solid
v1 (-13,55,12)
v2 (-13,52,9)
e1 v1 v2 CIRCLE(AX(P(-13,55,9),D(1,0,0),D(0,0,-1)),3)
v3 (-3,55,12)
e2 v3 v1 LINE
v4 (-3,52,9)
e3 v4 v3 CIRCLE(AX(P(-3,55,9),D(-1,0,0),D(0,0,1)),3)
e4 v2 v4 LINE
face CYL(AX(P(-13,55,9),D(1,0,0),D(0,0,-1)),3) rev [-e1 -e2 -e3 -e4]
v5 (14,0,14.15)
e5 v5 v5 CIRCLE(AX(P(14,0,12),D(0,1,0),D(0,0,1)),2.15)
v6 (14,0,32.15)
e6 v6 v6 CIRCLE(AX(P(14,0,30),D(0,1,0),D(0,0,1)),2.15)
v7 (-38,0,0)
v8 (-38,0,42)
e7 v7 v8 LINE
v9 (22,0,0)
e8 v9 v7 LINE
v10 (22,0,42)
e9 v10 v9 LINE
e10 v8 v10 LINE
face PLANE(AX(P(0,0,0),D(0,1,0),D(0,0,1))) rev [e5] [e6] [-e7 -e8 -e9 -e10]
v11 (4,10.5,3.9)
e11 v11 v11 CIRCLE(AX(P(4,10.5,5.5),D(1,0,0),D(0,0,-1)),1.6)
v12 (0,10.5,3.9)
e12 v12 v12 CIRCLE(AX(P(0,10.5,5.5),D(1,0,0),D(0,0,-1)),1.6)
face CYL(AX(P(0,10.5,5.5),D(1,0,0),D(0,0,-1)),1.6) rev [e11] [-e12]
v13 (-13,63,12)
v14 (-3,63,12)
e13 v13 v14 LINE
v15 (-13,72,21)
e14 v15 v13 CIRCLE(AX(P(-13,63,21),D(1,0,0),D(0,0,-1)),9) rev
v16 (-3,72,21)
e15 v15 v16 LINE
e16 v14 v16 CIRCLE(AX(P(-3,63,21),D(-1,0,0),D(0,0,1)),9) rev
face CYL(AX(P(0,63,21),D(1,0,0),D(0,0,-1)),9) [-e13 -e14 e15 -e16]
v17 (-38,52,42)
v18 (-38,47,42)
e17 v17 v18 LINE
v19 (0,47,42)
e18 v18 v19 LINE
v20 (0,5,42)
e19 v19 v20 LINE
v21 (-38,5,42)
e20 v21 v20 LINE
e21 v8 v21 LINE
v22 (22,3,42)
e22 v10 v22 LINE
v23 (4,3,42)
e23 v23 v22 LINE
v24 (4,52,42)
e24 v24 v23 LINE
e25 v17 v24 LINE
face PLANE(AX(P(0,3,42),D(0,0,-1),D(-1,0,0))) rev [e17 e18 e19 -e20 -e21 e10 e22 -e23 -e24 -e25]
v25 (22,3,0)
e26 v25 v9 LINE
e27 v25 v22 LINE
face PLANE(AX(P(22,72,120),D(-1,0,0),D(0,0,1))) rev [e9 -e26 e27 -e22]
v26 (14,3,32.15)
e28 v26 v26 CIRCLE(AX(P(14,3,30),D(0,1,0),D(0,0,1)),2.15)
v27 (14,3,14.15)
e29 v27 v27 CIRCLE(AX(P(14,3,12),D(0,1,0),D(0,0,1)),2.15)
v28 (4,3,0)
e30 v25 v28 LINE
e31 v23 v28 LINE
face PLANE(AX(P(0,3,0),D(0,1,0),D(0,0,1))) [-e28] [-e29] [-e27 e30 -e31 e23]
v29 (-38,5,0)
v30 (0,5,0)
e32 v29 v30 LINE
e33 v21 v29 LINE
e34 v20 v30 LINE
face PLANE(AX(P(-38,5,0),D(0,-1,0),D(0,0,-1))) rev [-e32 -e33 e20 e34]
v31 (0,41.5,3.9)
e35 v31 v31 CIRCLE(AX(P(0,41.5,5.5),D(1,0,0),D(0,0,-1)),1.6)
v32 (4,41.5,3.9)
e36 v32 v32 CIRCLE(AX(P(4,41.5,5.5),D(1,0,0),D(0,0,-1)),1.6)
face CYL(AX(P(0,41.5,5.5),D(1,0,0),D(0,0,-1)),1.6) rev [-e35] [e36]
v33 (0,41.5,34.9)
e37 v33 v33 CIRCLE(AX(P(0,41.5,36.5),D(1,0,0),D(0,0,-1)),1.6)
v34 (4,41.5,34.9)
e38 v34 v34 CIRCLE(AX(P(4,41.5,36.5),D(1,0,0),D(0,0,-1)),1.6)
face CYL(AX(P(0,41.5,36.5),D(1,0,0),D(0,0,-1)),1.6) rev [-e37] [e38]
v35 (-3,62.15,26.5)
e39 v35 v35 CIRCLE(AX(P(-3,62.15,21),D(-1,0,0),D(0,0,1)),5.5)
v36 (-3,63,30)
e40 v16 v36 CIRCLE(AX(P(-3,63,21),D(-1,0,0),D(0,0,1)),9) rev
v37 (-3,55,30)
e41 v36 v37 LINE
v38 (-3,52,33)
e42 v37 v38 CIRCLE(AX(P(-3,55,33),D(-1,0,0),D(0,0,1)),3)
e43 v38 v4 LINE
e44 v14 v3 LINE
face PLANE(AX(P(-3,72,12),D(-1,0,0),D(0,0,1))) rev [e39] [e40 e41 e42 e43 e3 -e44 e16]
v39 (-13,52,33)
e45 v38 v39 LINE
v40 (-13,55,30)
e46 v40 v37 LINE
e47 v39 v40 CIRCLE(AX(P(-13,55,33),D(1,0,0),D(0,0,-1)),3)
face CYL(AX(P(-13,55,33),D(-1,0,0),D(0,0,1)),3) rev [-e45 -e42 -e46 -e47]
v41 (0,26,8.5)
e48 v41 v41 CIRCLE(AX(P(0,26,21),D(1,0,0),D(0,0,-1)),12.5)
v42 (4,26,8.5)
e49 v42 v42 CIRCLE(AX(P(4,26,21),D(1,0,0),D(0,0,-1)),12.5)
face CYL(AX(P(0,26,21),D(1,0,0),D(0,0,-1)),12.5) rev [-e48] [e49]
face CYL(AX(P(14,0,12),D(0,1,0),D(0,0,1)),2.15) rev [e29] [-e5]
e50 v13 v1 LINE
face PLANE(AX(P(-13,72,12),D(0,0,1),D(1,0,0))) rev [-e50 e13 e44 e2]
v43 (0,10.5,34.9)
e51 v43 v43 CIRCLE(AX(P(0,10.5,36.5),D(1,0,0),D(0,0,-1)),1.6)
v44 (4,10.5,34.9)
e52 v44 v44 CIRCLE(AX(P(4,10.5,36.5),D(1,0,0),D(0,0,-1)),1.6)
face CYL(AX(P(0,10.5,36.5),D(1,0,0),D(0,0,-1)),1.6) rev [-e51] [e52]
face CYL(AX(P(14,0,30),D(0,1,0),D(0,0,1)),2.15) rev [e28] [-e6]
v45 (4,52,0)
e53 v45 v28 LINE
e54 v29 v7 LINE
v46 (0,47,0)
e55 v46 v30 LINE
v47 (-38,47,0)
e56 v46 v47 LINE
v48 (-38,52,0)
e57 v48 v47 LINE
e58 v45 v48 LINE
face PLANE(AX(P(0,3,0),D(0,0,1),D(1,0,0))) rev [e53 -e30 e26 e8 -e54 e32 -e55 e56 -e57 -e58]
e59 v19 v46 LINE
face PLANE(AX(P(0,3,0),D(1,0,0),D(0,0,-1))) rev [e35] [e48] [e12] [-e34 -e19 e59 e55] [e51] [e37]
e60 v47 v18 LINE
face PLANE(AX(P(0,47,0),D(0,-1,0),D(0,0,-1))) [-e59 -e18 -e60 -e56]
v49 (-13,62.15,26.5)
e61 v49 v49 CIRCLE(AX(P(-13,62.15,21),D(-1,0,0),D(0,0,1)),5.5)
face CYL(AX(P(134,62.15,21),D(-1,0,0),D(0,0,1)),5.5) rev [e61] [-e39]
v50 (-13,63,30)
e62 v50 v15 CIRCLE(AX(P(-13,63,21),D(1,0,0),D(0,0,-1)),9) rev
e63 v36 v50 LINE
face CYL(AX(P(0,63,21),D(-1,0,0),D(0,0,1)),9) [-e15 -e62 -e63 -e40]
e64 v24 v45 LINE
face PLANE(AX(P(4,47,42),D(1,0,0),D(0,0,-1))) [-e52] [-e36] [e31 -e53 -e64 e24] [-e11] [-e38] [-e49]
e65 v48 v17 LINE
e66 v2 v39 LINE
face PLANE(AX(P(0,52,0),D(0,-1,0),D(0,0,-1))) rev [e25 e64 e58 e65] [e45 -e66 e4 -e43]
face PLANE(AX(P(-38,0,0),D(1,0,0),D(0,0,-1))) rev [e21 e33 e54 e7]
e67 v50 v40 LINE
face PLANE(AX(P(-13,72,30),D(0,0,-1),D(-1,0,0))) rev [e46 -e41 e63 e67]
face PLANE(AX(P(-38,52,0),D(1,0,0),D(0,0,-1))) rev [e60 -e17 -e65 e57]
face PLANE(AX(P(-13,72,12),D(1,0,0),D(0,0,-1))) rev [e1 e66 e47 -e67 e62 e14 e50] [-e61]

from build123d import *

# Parameters (mm, degrees)
SKETCH1_W            = 94
SKETCH1_H            = 42
BOSS_EXTRUDE1_DEPTH  = 3
SKETCH2_W            = 4
SKETCH2_H            = 42
BOSS_EXTRUDE2_DEPTH  = 47
SKETCH3_R            = 12.5
SKETCH3_R_2          = 1.6
CUT_EXTRUDE1_DEPTH   = 114.176852757
SKETCH4_W            = 42
SKETCH4_H            = 5
BOSS_EXTRUDE3_DEPTH  = 40
SKETCH5_W            = 42
SKETCH5_H            = 5
BOSS_EXTRUDE4_DEPTH  = 38
SKETCH7_W            = 42
SKETCH7_H            = 42
SKETCH7_W_2          = 44
BOSS_EXTRUDE6_DEPTH  = 5
SKETCH9_R            = 2.15
CUT_EXTRUDE2_DEPTH   = 149.731301346
SKETCH11_W           = 10
SKETCH11_H           = 18
BOSS_EXTRUDE7_DEPTH  = 20
SKETCH13_R           = 5.5
CUT_EXTRUDE3_DEPTH   = 169.988165266
BOSS_EXTRUDE11_DEPTH = 5
SKETCH23_W           = 10
SKETCH23_H           = 26
BOSS_EXTRUDE12_DEPTH = 50
CUT_EXTRUDE7_DEPTH   = 193.595430891
SKETCH25_W           = 10
SKETCH25_H           = 18
BOSS_EXTRUDE13_DEPTH = 20
SKETCH26_R           = 5.5
CUT_EXTRUDE8_DEPTH   = 193.595430891
SKETCH27_W           = 12
SKETCH27_H           = 18
BOSS_EXTRUDE14_DEPTH = 69
CUT_EXTRUDE10_START  = -5
SKETCH28_R           = 5.5
CUT_EXTRUDE10_DEPTH  = 5
SKETCH29_R           = 5.5
CUT_EXTRUDE11_DEPTH  = 5
FILLET4_R            = 9
FILLET3_R            = 3
SKETCH30_W           = 112
SKETCH30_H           = 120
CUT_EXTRUDE13_DEPTH  = 181.413414135


# Some blends are built 0.0001 mm under size
with BuildPart() as part:
    # Sketch1 → Boss-Extrude1 (new body)
    with BuildSketch(Plane(origin=(0, 0, 0), x_dir=(1, 0, 0), z_dir=(0, 1, 0))):
        with Locations((47, -21)):
            Rectangle(SKETCH1_W, SKETCH1_H)
    extrude(amount=BOSS_EXTRUDE1_DEPTH)

    # Sketch2 → Boss-Extrude2 (add)
    with BuildSketch(Plane.XZ):
        with Locations((2, 21)):
            Rectangle(SKETCH2_W, SKETCH2_H)
        with Locations((92, 21)):
            Rectangle(SKETCH2_W, SKETCH2_H)
    extrude(amount=-BOSS_EXTRUDE2_DEPTH)

    # Sketch3 → Cut-Extrude1 (cut, through all)
    with BuildSketch(Plane(origin=(94, 0, 0), x_dir=(0, 0, -1), z_dir=(1, 0, 0))):
        with Locations((-21, 26)):
            Circle(SKETCH3_R)
        with Locations((-36.5, 41.5)):
            Circle(SKETCH3_R_2)
        with Locations((-5.5, 41.5)):
            Circle(SKETCH3_R_2)
        with Locations((-36.5, 10.5)):
            Circle(SKETCH3_R_2)
        with Locations((-5.5, 10.5)):
            Circle(SKETCH3_R_2)
    extrude(amount=-CUT_EXTRUDE1_DEPTH, mode=Mode.SUBTRACT)

    # Sketch4 → Boss-Extrude3 (add)
    with BuildSketch(Plane(origin=(94, 0, 0), x_dir=(0, 0, -1), z_dir=(1, 0, 0))):
        with Locations((-21, 2.5)):
            Rectangle(SKETCH4_W, SKETCH4_H)
    extrude(amount=BOSS_EXTRUDE3_DEPTH)

    # Sketch5 → Boss-Extrude4 (add)
    with BuildSketch(Plane.ZY):
        with Locations((21, 2.5)):
            Rectangle(SKETCH5_W, SKETCH5_H)
    extrude(amount=BOSS_EXTRUDE4_DEPTH)

    # Sketch7 → Boss-Extrude6 (add)
    with BuildSketch(Plane(origin=(0, 47, 0), x_dir=(1, 0, 0), z_dir=(0, 1, 0))):
        with Locations((-17, -21)):
            Rectangle(SKETCH7_W, SKETCH7_H)
        with Locations((112, -21)):
            Rectangle(SKETCH7_W_2, SKETCH7_H)
    extrude(amount=BOSS_EXTRUDE6_DEPTH)

    # Sketch9 → Cut-Extrude2 (cut, through all)
    with BuildSketch(Plane(origin=(0, 3, 0), x_dir=(1, 0, 0), z_dir=(0, 1, 0))):
        with Locations(Location((83, -20, 0), (0, 0, 270))):
            Circle(SKETCH9_R)
        with Locations(Location((65, -20, 0), (0, 0, 270))):
            Circle(SKETCH9_R)
        with Locations(Location((74, -11, 0), (0, 0, 270))):
            Circle(SKETCH9_R)
        with Locations(Location((74, -29, 0), (0, 0, 270))):
            Circle(SKETCH9_R)
        with Locations(Location((14, -12, 0), (0, 0, 270))):
            Circle(SKETCH9_R)
        with Locations(Location((14, -30, 0), (0, 0, 270))):
            Circle(SKETCH9_R)
        with Locations(Location((30, -12, 0), (0, 0, 270))):
            Circle(SKETCH9_R)
        with Locations(Location((30, -30, 0), (0, 0, 270))):
            Circle(SKETCH9_R)
    extrude(amount=-CUT_EXTRUDE2_DEPTH, mode=Mode.SUBTRACT)

    # Sketch11 → Boss-Extrude7 (add)
    with BuildSketch(Plane(origin=(0, 52, 0), x_dir=(1, 0, 0), z_dir=(0, 1, 0))):
        with Locations((-8, -21)):
            Rectangle(SKETCH11_W, SKETCH11_H)
        with Locations((107, -21)):
            Rectangle(SKETCH11_W, SKETCH11_H)
    extrude(amount=BOSS_EXTRUDE7_DEPTH)

    # Sketch13 → Cut-Extrude3 (cut, through all)
    with BuildSketch(Plane.ZY.offset(13)):
        with Locations((21, 62.15)):
            Circle(SKETCH13_R)
    extrude(amount=-CUT_EXTRUDE3_DEPTH, mode=Mode.SUBTRACT)

    # Sketch20 → Boss-Extrude11 (add)
    with BuildSketch(Plane.XY.offset(42)):
        Polygon((134, 0), (134, 52), (90, 52), (90, 0), (95, 0), (95, 20), (102, 26), (112, 26), (129, 20), (129, 0), align=None)
    extrude(amount=BOSS_EXTRUDE11_DEPTH)

    # Sketch23 → Boss-Extrude12 (add)
    with BuildSketch(Plane.XY.offset(47)):
        with Locations((107, 39)):
            Rectangle(SKETCH23_W, SKETCH23_H)
    extrude(amount=BOSS_EXTRUDE12_DEPTH)

    # Sketch24 → Cut-Extrude7 (cut, through all)
    with BuildSketch(Plane(origin=(112, 0, 0), x_dir=(0, 0, -1), z_dir=(1, 0, 0))):
        Polygon((-47, 26), (-97, 39), (-97, 26), align=None)
    extrude(amount=-CUT_EXTRUDE7_DEPTH, mode=Mode.SUBTRACT)

    # Sketch25 → Boss-Extrude13 (add)
    with BuildSketch(Plane(origin=(0, 52, 0), x_dir=(1, 0, 0), z_dir=(0, 1, 0))):
        with Locations((107, -71)):
            Rectangle(SKETCH25_W, SKETCH25_H)
    extrude(amount=BOSS_EXTRUDE13_DEPTH)

    # Sketch26 → Cut-Extrude8 (cut, through all)
    with BuildSketch(Plane(origin=(112, 0, 0), x_dir=(0, 0, -1), z_dir=(1, 0, 0))):
        with Locations((-71, 62.15)):
            Circle(SKETCH26_R)
    extrude(amount=-CUT_EXTRUDE8_DEPTH, mode=Mode.SUBTRACT)

    # Sketch27 → Boss-Extrude14 (add)
    with BuildSketch(Plane(origin=(0, 3, 0), x_dir=(1, 0, 0), z_dir=(0, 1, 0))):
        with Locations((47, -21)):
            Rectangle(SKETCH27_W, SKETCH27_H)
    extrude(amount=BOSS_EXTRUDE14_DEPTH)

    # Sketch28 → Cut-Extrude10 (cut)
    with BuildSketch(Plane(origin=(53, 0, 0), x_dir=(0, 0, -1), z_dir=(1, 0, 0)).offset(CUT_EXTRUDE10_START)):
        with Locations(Location((-21, 62.15, 0), (0, 0, 180))):
            Circle(SKETCH28_R)
    extrude(amount=CUT_EXTRUDE10_DEPTH, mode=Mode.SUBTRACT)

    # Sketch29 → Cut-Extrude11 (cut)
    with BuildSketch(Plane.ZY.offset(-41)):
        with Locations((21, 62.15)):
            Circle(SKETCH29_R)
    extrude(amount=-CUT_EXTRUDE11_DEPTH, mode=Mode.SUBTRACT)

    # Fillet4
    fillet4_edges = [part.edges().sort_by_distance(p)[0] for p in [
        (-8, 72, 12),
        (-8, 72, 30),
        (107, 72, 12),
        (107, 72, 30),
        (107, 72, 62),
        (107, 72, 80),
        (47, 72, 12),
        (47, 72, 30),
    ]]
    fillet(fillet4_edges, radius=FILLET4_R - 0.0001)  # a hair under: the kernel refuses the full size

    # Fillet3
    # the kernel refuses this fillet: 3 mm, written as the material it adds along each edge
    with BuildSketch(Plane(origin=(-3, 52, 30), x_dir=(0, 1, 0), z_dir=(-1, 0, 0)), Plane(origin=(112, 52, 80), x_dir=(0, 1, 0), z_dir=(-1, 0, 0))) as fillet3_piece_1:
        with BuildLine():
            CenterArc((FILLET3_R, -FILLET3_R), FILLET3_R, 90, 90)
            Line((0, -FILLET3_R), (0, 0))
            Line((0, 0), (FILLET3_R, 0))
        make_face()
    extrude(amount=10)
    with BuildSketch(Plane(origin=(-13, 52, 12), x_dir=(0, 0, -1), z_dir=(1, 0, 0)), Plane(origin=(112, 52, 30), x_dir=(0, 0, 1), z_dir=(-1, 0, 0)), Plane(origin=(102, 52, 12), x_dir=(0, 0, -1), z_dir=(1, 0, 0)), Plane(origin=(102, 52, 62), x_dir=(0, 0, -1), z_dir=(1, 0, 0))) as fillet3_piece_2:
        with BuildLine():
            CenterArc((FILLET3_R, FILLET3_R), FILLET3_R, 180, 90)
            Line((0, FILLET3_R), (0, 0))
            Line((0, 0), (FILLET3_R, 0))
        make_face()
    extrude(amount=10)
    with BuildSketch(Plane(origin=(95, 20, 42), x_dir=(0, -1, 0), z_dir=(0, 0, 1))) as fillet3_piece_3:
        with BuildLine():
            CenterArc((FILLET3_R * 0.45993492247, FILLET3_R), FILLET3_R, 220.601294645, 49.398705355)
            Line((-FILLET3_R * 0.299321679895, FILLET3_R * 0.349208626544), (0, 0))
            Line((0, 0), (FILLET3_R * 0.45993492247, 0))
        make_face()
    extrude(amount=5)
    with BuildSketch(Plane(origin=(102, 26, 42), x_dir=(-0.7592566023652966, -0.6507913734559685, 0), z_dir=(0, 0, 1))) as fillet3_piece_4:
        with BuildLine():
            CenterArc((FILLET3_R * 0.369924076215, FILLET3_R), FILLET3_R, 229.398705355, 40.601294645)
            Line((-FILLET3_R * 0.28086729724, FILLET3_R * 0.240743397635), (0, 0))
            Line((0, 0), (FILLET3_R * 0.369924076215, 0))
        make_face()
    extrude(amount=5)
    with BuildSketch(Plane(origin=(112, 26, 42), x_dir=(0.942990333582889, -0.3328201177351389, 0), z_dir=(0, 0, 1))) as fillet3_piece_5:
        with BuildLine():
            CenterArc((FILLET3_R * 0.171292729553, -FILLET3_R), FILLET3_R, 90, 19.440034828)
            Line((-FILLET3_R * 0.161527388182, -FILLET3_R * 0.0570096664171), (0, 0))
            Line((0, 0), (FILLET3_R * 0.171292729553, 0))
        make_face()
    extrude(amount=5)
    with BuildSketch(Plane(origin=(129, 20, 42), x_dir=(0, -1, 0), z_dir=(0, 0, 1))) as fillet3_piece_6:
        with BuildLine():
            CenterArc((FILLET3_R * 0.707515081019, -FILLET3_R), FILLET3_R, 90, 70.559965172)
            Line((-FILLET3_R * 0.235475252564, -FILLET3_R * 0.667179882265), (0, 0))
            Line((0, 0), (FILLET3_R * 0.707515081019, 0))
        make_face()
    extrude(amount=5)
    with BuildSketch(Plane(origin=(53, 3, 30), x_dir=(0, 0, 1), z_dir=(-1, 0, 0)), Plane(origin=(41, 3, 12), x_dir=(0, 0, -1), z_dir=(1, 0, 0))) as fillet3_piece_7:
        with BuildLine():
            CenterArc((FILLET3_R, FILLET3_R), FILLET3_R, 180, 90)
            Line((0, FILLET3_R), (0, 0))
            Line((0, 0), (FILLET3_R, 0))
        make_face()
    extrude(amount=12)
    # the kernel refuses this fillet: 3 mm, written as the material it takes off along each edge
    with BuildSketch(Plane(origin=(94.5, 52, 97), x_dir=(0, 0, -1), z_dir=(1, 0, 0))) as fillet3_2_piece_1:
        with BuildLine():
            CenterArc((FILLET3_R, -FILLET3_R), FILLET3_R, 90, 90)
            Line((0, -FILLET3_R), (0, 0))
            Line((0, 0), (FILLET3_R, 0))
        make_face()
    extrude(amount=25, mode=Mode.SUBTRACT)
    with BuildSketch(Plane(origin=(117.799354812, 39, 97), x_dir=(0, -0.25163385176495195, -0.9678225067882716), z_dir=(-1, 0, 0))) as fillet3_2_piece_2:
        with BuildLine():
            CenterArc((FILLET3_R * 0.773247308247, -FILLET3_R), FILLET3_R, 90, 75.425783802)
            Line((-FILLET3_R * 0.194575198541, -FILLET3_R * 0.748366148235), (0, 0))
            Line((0, 0), (FILLET3_R * 0.773247308247, 0))
        make_face()
    extrude(amount=21.598709624, mode=Mode.SUBTRACT)

    # Sketch30 → Cut-Extrude13 (cut, through all)
    with BuildSketch(Plane.XZ):
        with Locations((78, 60)):
            Rectangle(SKETCH30_W, SKETCH30_H)
    extrude(amount=-CUT_EXTRUDE13_DEPTH, mode=Mode.SUBTRACT)


solid = part.part
